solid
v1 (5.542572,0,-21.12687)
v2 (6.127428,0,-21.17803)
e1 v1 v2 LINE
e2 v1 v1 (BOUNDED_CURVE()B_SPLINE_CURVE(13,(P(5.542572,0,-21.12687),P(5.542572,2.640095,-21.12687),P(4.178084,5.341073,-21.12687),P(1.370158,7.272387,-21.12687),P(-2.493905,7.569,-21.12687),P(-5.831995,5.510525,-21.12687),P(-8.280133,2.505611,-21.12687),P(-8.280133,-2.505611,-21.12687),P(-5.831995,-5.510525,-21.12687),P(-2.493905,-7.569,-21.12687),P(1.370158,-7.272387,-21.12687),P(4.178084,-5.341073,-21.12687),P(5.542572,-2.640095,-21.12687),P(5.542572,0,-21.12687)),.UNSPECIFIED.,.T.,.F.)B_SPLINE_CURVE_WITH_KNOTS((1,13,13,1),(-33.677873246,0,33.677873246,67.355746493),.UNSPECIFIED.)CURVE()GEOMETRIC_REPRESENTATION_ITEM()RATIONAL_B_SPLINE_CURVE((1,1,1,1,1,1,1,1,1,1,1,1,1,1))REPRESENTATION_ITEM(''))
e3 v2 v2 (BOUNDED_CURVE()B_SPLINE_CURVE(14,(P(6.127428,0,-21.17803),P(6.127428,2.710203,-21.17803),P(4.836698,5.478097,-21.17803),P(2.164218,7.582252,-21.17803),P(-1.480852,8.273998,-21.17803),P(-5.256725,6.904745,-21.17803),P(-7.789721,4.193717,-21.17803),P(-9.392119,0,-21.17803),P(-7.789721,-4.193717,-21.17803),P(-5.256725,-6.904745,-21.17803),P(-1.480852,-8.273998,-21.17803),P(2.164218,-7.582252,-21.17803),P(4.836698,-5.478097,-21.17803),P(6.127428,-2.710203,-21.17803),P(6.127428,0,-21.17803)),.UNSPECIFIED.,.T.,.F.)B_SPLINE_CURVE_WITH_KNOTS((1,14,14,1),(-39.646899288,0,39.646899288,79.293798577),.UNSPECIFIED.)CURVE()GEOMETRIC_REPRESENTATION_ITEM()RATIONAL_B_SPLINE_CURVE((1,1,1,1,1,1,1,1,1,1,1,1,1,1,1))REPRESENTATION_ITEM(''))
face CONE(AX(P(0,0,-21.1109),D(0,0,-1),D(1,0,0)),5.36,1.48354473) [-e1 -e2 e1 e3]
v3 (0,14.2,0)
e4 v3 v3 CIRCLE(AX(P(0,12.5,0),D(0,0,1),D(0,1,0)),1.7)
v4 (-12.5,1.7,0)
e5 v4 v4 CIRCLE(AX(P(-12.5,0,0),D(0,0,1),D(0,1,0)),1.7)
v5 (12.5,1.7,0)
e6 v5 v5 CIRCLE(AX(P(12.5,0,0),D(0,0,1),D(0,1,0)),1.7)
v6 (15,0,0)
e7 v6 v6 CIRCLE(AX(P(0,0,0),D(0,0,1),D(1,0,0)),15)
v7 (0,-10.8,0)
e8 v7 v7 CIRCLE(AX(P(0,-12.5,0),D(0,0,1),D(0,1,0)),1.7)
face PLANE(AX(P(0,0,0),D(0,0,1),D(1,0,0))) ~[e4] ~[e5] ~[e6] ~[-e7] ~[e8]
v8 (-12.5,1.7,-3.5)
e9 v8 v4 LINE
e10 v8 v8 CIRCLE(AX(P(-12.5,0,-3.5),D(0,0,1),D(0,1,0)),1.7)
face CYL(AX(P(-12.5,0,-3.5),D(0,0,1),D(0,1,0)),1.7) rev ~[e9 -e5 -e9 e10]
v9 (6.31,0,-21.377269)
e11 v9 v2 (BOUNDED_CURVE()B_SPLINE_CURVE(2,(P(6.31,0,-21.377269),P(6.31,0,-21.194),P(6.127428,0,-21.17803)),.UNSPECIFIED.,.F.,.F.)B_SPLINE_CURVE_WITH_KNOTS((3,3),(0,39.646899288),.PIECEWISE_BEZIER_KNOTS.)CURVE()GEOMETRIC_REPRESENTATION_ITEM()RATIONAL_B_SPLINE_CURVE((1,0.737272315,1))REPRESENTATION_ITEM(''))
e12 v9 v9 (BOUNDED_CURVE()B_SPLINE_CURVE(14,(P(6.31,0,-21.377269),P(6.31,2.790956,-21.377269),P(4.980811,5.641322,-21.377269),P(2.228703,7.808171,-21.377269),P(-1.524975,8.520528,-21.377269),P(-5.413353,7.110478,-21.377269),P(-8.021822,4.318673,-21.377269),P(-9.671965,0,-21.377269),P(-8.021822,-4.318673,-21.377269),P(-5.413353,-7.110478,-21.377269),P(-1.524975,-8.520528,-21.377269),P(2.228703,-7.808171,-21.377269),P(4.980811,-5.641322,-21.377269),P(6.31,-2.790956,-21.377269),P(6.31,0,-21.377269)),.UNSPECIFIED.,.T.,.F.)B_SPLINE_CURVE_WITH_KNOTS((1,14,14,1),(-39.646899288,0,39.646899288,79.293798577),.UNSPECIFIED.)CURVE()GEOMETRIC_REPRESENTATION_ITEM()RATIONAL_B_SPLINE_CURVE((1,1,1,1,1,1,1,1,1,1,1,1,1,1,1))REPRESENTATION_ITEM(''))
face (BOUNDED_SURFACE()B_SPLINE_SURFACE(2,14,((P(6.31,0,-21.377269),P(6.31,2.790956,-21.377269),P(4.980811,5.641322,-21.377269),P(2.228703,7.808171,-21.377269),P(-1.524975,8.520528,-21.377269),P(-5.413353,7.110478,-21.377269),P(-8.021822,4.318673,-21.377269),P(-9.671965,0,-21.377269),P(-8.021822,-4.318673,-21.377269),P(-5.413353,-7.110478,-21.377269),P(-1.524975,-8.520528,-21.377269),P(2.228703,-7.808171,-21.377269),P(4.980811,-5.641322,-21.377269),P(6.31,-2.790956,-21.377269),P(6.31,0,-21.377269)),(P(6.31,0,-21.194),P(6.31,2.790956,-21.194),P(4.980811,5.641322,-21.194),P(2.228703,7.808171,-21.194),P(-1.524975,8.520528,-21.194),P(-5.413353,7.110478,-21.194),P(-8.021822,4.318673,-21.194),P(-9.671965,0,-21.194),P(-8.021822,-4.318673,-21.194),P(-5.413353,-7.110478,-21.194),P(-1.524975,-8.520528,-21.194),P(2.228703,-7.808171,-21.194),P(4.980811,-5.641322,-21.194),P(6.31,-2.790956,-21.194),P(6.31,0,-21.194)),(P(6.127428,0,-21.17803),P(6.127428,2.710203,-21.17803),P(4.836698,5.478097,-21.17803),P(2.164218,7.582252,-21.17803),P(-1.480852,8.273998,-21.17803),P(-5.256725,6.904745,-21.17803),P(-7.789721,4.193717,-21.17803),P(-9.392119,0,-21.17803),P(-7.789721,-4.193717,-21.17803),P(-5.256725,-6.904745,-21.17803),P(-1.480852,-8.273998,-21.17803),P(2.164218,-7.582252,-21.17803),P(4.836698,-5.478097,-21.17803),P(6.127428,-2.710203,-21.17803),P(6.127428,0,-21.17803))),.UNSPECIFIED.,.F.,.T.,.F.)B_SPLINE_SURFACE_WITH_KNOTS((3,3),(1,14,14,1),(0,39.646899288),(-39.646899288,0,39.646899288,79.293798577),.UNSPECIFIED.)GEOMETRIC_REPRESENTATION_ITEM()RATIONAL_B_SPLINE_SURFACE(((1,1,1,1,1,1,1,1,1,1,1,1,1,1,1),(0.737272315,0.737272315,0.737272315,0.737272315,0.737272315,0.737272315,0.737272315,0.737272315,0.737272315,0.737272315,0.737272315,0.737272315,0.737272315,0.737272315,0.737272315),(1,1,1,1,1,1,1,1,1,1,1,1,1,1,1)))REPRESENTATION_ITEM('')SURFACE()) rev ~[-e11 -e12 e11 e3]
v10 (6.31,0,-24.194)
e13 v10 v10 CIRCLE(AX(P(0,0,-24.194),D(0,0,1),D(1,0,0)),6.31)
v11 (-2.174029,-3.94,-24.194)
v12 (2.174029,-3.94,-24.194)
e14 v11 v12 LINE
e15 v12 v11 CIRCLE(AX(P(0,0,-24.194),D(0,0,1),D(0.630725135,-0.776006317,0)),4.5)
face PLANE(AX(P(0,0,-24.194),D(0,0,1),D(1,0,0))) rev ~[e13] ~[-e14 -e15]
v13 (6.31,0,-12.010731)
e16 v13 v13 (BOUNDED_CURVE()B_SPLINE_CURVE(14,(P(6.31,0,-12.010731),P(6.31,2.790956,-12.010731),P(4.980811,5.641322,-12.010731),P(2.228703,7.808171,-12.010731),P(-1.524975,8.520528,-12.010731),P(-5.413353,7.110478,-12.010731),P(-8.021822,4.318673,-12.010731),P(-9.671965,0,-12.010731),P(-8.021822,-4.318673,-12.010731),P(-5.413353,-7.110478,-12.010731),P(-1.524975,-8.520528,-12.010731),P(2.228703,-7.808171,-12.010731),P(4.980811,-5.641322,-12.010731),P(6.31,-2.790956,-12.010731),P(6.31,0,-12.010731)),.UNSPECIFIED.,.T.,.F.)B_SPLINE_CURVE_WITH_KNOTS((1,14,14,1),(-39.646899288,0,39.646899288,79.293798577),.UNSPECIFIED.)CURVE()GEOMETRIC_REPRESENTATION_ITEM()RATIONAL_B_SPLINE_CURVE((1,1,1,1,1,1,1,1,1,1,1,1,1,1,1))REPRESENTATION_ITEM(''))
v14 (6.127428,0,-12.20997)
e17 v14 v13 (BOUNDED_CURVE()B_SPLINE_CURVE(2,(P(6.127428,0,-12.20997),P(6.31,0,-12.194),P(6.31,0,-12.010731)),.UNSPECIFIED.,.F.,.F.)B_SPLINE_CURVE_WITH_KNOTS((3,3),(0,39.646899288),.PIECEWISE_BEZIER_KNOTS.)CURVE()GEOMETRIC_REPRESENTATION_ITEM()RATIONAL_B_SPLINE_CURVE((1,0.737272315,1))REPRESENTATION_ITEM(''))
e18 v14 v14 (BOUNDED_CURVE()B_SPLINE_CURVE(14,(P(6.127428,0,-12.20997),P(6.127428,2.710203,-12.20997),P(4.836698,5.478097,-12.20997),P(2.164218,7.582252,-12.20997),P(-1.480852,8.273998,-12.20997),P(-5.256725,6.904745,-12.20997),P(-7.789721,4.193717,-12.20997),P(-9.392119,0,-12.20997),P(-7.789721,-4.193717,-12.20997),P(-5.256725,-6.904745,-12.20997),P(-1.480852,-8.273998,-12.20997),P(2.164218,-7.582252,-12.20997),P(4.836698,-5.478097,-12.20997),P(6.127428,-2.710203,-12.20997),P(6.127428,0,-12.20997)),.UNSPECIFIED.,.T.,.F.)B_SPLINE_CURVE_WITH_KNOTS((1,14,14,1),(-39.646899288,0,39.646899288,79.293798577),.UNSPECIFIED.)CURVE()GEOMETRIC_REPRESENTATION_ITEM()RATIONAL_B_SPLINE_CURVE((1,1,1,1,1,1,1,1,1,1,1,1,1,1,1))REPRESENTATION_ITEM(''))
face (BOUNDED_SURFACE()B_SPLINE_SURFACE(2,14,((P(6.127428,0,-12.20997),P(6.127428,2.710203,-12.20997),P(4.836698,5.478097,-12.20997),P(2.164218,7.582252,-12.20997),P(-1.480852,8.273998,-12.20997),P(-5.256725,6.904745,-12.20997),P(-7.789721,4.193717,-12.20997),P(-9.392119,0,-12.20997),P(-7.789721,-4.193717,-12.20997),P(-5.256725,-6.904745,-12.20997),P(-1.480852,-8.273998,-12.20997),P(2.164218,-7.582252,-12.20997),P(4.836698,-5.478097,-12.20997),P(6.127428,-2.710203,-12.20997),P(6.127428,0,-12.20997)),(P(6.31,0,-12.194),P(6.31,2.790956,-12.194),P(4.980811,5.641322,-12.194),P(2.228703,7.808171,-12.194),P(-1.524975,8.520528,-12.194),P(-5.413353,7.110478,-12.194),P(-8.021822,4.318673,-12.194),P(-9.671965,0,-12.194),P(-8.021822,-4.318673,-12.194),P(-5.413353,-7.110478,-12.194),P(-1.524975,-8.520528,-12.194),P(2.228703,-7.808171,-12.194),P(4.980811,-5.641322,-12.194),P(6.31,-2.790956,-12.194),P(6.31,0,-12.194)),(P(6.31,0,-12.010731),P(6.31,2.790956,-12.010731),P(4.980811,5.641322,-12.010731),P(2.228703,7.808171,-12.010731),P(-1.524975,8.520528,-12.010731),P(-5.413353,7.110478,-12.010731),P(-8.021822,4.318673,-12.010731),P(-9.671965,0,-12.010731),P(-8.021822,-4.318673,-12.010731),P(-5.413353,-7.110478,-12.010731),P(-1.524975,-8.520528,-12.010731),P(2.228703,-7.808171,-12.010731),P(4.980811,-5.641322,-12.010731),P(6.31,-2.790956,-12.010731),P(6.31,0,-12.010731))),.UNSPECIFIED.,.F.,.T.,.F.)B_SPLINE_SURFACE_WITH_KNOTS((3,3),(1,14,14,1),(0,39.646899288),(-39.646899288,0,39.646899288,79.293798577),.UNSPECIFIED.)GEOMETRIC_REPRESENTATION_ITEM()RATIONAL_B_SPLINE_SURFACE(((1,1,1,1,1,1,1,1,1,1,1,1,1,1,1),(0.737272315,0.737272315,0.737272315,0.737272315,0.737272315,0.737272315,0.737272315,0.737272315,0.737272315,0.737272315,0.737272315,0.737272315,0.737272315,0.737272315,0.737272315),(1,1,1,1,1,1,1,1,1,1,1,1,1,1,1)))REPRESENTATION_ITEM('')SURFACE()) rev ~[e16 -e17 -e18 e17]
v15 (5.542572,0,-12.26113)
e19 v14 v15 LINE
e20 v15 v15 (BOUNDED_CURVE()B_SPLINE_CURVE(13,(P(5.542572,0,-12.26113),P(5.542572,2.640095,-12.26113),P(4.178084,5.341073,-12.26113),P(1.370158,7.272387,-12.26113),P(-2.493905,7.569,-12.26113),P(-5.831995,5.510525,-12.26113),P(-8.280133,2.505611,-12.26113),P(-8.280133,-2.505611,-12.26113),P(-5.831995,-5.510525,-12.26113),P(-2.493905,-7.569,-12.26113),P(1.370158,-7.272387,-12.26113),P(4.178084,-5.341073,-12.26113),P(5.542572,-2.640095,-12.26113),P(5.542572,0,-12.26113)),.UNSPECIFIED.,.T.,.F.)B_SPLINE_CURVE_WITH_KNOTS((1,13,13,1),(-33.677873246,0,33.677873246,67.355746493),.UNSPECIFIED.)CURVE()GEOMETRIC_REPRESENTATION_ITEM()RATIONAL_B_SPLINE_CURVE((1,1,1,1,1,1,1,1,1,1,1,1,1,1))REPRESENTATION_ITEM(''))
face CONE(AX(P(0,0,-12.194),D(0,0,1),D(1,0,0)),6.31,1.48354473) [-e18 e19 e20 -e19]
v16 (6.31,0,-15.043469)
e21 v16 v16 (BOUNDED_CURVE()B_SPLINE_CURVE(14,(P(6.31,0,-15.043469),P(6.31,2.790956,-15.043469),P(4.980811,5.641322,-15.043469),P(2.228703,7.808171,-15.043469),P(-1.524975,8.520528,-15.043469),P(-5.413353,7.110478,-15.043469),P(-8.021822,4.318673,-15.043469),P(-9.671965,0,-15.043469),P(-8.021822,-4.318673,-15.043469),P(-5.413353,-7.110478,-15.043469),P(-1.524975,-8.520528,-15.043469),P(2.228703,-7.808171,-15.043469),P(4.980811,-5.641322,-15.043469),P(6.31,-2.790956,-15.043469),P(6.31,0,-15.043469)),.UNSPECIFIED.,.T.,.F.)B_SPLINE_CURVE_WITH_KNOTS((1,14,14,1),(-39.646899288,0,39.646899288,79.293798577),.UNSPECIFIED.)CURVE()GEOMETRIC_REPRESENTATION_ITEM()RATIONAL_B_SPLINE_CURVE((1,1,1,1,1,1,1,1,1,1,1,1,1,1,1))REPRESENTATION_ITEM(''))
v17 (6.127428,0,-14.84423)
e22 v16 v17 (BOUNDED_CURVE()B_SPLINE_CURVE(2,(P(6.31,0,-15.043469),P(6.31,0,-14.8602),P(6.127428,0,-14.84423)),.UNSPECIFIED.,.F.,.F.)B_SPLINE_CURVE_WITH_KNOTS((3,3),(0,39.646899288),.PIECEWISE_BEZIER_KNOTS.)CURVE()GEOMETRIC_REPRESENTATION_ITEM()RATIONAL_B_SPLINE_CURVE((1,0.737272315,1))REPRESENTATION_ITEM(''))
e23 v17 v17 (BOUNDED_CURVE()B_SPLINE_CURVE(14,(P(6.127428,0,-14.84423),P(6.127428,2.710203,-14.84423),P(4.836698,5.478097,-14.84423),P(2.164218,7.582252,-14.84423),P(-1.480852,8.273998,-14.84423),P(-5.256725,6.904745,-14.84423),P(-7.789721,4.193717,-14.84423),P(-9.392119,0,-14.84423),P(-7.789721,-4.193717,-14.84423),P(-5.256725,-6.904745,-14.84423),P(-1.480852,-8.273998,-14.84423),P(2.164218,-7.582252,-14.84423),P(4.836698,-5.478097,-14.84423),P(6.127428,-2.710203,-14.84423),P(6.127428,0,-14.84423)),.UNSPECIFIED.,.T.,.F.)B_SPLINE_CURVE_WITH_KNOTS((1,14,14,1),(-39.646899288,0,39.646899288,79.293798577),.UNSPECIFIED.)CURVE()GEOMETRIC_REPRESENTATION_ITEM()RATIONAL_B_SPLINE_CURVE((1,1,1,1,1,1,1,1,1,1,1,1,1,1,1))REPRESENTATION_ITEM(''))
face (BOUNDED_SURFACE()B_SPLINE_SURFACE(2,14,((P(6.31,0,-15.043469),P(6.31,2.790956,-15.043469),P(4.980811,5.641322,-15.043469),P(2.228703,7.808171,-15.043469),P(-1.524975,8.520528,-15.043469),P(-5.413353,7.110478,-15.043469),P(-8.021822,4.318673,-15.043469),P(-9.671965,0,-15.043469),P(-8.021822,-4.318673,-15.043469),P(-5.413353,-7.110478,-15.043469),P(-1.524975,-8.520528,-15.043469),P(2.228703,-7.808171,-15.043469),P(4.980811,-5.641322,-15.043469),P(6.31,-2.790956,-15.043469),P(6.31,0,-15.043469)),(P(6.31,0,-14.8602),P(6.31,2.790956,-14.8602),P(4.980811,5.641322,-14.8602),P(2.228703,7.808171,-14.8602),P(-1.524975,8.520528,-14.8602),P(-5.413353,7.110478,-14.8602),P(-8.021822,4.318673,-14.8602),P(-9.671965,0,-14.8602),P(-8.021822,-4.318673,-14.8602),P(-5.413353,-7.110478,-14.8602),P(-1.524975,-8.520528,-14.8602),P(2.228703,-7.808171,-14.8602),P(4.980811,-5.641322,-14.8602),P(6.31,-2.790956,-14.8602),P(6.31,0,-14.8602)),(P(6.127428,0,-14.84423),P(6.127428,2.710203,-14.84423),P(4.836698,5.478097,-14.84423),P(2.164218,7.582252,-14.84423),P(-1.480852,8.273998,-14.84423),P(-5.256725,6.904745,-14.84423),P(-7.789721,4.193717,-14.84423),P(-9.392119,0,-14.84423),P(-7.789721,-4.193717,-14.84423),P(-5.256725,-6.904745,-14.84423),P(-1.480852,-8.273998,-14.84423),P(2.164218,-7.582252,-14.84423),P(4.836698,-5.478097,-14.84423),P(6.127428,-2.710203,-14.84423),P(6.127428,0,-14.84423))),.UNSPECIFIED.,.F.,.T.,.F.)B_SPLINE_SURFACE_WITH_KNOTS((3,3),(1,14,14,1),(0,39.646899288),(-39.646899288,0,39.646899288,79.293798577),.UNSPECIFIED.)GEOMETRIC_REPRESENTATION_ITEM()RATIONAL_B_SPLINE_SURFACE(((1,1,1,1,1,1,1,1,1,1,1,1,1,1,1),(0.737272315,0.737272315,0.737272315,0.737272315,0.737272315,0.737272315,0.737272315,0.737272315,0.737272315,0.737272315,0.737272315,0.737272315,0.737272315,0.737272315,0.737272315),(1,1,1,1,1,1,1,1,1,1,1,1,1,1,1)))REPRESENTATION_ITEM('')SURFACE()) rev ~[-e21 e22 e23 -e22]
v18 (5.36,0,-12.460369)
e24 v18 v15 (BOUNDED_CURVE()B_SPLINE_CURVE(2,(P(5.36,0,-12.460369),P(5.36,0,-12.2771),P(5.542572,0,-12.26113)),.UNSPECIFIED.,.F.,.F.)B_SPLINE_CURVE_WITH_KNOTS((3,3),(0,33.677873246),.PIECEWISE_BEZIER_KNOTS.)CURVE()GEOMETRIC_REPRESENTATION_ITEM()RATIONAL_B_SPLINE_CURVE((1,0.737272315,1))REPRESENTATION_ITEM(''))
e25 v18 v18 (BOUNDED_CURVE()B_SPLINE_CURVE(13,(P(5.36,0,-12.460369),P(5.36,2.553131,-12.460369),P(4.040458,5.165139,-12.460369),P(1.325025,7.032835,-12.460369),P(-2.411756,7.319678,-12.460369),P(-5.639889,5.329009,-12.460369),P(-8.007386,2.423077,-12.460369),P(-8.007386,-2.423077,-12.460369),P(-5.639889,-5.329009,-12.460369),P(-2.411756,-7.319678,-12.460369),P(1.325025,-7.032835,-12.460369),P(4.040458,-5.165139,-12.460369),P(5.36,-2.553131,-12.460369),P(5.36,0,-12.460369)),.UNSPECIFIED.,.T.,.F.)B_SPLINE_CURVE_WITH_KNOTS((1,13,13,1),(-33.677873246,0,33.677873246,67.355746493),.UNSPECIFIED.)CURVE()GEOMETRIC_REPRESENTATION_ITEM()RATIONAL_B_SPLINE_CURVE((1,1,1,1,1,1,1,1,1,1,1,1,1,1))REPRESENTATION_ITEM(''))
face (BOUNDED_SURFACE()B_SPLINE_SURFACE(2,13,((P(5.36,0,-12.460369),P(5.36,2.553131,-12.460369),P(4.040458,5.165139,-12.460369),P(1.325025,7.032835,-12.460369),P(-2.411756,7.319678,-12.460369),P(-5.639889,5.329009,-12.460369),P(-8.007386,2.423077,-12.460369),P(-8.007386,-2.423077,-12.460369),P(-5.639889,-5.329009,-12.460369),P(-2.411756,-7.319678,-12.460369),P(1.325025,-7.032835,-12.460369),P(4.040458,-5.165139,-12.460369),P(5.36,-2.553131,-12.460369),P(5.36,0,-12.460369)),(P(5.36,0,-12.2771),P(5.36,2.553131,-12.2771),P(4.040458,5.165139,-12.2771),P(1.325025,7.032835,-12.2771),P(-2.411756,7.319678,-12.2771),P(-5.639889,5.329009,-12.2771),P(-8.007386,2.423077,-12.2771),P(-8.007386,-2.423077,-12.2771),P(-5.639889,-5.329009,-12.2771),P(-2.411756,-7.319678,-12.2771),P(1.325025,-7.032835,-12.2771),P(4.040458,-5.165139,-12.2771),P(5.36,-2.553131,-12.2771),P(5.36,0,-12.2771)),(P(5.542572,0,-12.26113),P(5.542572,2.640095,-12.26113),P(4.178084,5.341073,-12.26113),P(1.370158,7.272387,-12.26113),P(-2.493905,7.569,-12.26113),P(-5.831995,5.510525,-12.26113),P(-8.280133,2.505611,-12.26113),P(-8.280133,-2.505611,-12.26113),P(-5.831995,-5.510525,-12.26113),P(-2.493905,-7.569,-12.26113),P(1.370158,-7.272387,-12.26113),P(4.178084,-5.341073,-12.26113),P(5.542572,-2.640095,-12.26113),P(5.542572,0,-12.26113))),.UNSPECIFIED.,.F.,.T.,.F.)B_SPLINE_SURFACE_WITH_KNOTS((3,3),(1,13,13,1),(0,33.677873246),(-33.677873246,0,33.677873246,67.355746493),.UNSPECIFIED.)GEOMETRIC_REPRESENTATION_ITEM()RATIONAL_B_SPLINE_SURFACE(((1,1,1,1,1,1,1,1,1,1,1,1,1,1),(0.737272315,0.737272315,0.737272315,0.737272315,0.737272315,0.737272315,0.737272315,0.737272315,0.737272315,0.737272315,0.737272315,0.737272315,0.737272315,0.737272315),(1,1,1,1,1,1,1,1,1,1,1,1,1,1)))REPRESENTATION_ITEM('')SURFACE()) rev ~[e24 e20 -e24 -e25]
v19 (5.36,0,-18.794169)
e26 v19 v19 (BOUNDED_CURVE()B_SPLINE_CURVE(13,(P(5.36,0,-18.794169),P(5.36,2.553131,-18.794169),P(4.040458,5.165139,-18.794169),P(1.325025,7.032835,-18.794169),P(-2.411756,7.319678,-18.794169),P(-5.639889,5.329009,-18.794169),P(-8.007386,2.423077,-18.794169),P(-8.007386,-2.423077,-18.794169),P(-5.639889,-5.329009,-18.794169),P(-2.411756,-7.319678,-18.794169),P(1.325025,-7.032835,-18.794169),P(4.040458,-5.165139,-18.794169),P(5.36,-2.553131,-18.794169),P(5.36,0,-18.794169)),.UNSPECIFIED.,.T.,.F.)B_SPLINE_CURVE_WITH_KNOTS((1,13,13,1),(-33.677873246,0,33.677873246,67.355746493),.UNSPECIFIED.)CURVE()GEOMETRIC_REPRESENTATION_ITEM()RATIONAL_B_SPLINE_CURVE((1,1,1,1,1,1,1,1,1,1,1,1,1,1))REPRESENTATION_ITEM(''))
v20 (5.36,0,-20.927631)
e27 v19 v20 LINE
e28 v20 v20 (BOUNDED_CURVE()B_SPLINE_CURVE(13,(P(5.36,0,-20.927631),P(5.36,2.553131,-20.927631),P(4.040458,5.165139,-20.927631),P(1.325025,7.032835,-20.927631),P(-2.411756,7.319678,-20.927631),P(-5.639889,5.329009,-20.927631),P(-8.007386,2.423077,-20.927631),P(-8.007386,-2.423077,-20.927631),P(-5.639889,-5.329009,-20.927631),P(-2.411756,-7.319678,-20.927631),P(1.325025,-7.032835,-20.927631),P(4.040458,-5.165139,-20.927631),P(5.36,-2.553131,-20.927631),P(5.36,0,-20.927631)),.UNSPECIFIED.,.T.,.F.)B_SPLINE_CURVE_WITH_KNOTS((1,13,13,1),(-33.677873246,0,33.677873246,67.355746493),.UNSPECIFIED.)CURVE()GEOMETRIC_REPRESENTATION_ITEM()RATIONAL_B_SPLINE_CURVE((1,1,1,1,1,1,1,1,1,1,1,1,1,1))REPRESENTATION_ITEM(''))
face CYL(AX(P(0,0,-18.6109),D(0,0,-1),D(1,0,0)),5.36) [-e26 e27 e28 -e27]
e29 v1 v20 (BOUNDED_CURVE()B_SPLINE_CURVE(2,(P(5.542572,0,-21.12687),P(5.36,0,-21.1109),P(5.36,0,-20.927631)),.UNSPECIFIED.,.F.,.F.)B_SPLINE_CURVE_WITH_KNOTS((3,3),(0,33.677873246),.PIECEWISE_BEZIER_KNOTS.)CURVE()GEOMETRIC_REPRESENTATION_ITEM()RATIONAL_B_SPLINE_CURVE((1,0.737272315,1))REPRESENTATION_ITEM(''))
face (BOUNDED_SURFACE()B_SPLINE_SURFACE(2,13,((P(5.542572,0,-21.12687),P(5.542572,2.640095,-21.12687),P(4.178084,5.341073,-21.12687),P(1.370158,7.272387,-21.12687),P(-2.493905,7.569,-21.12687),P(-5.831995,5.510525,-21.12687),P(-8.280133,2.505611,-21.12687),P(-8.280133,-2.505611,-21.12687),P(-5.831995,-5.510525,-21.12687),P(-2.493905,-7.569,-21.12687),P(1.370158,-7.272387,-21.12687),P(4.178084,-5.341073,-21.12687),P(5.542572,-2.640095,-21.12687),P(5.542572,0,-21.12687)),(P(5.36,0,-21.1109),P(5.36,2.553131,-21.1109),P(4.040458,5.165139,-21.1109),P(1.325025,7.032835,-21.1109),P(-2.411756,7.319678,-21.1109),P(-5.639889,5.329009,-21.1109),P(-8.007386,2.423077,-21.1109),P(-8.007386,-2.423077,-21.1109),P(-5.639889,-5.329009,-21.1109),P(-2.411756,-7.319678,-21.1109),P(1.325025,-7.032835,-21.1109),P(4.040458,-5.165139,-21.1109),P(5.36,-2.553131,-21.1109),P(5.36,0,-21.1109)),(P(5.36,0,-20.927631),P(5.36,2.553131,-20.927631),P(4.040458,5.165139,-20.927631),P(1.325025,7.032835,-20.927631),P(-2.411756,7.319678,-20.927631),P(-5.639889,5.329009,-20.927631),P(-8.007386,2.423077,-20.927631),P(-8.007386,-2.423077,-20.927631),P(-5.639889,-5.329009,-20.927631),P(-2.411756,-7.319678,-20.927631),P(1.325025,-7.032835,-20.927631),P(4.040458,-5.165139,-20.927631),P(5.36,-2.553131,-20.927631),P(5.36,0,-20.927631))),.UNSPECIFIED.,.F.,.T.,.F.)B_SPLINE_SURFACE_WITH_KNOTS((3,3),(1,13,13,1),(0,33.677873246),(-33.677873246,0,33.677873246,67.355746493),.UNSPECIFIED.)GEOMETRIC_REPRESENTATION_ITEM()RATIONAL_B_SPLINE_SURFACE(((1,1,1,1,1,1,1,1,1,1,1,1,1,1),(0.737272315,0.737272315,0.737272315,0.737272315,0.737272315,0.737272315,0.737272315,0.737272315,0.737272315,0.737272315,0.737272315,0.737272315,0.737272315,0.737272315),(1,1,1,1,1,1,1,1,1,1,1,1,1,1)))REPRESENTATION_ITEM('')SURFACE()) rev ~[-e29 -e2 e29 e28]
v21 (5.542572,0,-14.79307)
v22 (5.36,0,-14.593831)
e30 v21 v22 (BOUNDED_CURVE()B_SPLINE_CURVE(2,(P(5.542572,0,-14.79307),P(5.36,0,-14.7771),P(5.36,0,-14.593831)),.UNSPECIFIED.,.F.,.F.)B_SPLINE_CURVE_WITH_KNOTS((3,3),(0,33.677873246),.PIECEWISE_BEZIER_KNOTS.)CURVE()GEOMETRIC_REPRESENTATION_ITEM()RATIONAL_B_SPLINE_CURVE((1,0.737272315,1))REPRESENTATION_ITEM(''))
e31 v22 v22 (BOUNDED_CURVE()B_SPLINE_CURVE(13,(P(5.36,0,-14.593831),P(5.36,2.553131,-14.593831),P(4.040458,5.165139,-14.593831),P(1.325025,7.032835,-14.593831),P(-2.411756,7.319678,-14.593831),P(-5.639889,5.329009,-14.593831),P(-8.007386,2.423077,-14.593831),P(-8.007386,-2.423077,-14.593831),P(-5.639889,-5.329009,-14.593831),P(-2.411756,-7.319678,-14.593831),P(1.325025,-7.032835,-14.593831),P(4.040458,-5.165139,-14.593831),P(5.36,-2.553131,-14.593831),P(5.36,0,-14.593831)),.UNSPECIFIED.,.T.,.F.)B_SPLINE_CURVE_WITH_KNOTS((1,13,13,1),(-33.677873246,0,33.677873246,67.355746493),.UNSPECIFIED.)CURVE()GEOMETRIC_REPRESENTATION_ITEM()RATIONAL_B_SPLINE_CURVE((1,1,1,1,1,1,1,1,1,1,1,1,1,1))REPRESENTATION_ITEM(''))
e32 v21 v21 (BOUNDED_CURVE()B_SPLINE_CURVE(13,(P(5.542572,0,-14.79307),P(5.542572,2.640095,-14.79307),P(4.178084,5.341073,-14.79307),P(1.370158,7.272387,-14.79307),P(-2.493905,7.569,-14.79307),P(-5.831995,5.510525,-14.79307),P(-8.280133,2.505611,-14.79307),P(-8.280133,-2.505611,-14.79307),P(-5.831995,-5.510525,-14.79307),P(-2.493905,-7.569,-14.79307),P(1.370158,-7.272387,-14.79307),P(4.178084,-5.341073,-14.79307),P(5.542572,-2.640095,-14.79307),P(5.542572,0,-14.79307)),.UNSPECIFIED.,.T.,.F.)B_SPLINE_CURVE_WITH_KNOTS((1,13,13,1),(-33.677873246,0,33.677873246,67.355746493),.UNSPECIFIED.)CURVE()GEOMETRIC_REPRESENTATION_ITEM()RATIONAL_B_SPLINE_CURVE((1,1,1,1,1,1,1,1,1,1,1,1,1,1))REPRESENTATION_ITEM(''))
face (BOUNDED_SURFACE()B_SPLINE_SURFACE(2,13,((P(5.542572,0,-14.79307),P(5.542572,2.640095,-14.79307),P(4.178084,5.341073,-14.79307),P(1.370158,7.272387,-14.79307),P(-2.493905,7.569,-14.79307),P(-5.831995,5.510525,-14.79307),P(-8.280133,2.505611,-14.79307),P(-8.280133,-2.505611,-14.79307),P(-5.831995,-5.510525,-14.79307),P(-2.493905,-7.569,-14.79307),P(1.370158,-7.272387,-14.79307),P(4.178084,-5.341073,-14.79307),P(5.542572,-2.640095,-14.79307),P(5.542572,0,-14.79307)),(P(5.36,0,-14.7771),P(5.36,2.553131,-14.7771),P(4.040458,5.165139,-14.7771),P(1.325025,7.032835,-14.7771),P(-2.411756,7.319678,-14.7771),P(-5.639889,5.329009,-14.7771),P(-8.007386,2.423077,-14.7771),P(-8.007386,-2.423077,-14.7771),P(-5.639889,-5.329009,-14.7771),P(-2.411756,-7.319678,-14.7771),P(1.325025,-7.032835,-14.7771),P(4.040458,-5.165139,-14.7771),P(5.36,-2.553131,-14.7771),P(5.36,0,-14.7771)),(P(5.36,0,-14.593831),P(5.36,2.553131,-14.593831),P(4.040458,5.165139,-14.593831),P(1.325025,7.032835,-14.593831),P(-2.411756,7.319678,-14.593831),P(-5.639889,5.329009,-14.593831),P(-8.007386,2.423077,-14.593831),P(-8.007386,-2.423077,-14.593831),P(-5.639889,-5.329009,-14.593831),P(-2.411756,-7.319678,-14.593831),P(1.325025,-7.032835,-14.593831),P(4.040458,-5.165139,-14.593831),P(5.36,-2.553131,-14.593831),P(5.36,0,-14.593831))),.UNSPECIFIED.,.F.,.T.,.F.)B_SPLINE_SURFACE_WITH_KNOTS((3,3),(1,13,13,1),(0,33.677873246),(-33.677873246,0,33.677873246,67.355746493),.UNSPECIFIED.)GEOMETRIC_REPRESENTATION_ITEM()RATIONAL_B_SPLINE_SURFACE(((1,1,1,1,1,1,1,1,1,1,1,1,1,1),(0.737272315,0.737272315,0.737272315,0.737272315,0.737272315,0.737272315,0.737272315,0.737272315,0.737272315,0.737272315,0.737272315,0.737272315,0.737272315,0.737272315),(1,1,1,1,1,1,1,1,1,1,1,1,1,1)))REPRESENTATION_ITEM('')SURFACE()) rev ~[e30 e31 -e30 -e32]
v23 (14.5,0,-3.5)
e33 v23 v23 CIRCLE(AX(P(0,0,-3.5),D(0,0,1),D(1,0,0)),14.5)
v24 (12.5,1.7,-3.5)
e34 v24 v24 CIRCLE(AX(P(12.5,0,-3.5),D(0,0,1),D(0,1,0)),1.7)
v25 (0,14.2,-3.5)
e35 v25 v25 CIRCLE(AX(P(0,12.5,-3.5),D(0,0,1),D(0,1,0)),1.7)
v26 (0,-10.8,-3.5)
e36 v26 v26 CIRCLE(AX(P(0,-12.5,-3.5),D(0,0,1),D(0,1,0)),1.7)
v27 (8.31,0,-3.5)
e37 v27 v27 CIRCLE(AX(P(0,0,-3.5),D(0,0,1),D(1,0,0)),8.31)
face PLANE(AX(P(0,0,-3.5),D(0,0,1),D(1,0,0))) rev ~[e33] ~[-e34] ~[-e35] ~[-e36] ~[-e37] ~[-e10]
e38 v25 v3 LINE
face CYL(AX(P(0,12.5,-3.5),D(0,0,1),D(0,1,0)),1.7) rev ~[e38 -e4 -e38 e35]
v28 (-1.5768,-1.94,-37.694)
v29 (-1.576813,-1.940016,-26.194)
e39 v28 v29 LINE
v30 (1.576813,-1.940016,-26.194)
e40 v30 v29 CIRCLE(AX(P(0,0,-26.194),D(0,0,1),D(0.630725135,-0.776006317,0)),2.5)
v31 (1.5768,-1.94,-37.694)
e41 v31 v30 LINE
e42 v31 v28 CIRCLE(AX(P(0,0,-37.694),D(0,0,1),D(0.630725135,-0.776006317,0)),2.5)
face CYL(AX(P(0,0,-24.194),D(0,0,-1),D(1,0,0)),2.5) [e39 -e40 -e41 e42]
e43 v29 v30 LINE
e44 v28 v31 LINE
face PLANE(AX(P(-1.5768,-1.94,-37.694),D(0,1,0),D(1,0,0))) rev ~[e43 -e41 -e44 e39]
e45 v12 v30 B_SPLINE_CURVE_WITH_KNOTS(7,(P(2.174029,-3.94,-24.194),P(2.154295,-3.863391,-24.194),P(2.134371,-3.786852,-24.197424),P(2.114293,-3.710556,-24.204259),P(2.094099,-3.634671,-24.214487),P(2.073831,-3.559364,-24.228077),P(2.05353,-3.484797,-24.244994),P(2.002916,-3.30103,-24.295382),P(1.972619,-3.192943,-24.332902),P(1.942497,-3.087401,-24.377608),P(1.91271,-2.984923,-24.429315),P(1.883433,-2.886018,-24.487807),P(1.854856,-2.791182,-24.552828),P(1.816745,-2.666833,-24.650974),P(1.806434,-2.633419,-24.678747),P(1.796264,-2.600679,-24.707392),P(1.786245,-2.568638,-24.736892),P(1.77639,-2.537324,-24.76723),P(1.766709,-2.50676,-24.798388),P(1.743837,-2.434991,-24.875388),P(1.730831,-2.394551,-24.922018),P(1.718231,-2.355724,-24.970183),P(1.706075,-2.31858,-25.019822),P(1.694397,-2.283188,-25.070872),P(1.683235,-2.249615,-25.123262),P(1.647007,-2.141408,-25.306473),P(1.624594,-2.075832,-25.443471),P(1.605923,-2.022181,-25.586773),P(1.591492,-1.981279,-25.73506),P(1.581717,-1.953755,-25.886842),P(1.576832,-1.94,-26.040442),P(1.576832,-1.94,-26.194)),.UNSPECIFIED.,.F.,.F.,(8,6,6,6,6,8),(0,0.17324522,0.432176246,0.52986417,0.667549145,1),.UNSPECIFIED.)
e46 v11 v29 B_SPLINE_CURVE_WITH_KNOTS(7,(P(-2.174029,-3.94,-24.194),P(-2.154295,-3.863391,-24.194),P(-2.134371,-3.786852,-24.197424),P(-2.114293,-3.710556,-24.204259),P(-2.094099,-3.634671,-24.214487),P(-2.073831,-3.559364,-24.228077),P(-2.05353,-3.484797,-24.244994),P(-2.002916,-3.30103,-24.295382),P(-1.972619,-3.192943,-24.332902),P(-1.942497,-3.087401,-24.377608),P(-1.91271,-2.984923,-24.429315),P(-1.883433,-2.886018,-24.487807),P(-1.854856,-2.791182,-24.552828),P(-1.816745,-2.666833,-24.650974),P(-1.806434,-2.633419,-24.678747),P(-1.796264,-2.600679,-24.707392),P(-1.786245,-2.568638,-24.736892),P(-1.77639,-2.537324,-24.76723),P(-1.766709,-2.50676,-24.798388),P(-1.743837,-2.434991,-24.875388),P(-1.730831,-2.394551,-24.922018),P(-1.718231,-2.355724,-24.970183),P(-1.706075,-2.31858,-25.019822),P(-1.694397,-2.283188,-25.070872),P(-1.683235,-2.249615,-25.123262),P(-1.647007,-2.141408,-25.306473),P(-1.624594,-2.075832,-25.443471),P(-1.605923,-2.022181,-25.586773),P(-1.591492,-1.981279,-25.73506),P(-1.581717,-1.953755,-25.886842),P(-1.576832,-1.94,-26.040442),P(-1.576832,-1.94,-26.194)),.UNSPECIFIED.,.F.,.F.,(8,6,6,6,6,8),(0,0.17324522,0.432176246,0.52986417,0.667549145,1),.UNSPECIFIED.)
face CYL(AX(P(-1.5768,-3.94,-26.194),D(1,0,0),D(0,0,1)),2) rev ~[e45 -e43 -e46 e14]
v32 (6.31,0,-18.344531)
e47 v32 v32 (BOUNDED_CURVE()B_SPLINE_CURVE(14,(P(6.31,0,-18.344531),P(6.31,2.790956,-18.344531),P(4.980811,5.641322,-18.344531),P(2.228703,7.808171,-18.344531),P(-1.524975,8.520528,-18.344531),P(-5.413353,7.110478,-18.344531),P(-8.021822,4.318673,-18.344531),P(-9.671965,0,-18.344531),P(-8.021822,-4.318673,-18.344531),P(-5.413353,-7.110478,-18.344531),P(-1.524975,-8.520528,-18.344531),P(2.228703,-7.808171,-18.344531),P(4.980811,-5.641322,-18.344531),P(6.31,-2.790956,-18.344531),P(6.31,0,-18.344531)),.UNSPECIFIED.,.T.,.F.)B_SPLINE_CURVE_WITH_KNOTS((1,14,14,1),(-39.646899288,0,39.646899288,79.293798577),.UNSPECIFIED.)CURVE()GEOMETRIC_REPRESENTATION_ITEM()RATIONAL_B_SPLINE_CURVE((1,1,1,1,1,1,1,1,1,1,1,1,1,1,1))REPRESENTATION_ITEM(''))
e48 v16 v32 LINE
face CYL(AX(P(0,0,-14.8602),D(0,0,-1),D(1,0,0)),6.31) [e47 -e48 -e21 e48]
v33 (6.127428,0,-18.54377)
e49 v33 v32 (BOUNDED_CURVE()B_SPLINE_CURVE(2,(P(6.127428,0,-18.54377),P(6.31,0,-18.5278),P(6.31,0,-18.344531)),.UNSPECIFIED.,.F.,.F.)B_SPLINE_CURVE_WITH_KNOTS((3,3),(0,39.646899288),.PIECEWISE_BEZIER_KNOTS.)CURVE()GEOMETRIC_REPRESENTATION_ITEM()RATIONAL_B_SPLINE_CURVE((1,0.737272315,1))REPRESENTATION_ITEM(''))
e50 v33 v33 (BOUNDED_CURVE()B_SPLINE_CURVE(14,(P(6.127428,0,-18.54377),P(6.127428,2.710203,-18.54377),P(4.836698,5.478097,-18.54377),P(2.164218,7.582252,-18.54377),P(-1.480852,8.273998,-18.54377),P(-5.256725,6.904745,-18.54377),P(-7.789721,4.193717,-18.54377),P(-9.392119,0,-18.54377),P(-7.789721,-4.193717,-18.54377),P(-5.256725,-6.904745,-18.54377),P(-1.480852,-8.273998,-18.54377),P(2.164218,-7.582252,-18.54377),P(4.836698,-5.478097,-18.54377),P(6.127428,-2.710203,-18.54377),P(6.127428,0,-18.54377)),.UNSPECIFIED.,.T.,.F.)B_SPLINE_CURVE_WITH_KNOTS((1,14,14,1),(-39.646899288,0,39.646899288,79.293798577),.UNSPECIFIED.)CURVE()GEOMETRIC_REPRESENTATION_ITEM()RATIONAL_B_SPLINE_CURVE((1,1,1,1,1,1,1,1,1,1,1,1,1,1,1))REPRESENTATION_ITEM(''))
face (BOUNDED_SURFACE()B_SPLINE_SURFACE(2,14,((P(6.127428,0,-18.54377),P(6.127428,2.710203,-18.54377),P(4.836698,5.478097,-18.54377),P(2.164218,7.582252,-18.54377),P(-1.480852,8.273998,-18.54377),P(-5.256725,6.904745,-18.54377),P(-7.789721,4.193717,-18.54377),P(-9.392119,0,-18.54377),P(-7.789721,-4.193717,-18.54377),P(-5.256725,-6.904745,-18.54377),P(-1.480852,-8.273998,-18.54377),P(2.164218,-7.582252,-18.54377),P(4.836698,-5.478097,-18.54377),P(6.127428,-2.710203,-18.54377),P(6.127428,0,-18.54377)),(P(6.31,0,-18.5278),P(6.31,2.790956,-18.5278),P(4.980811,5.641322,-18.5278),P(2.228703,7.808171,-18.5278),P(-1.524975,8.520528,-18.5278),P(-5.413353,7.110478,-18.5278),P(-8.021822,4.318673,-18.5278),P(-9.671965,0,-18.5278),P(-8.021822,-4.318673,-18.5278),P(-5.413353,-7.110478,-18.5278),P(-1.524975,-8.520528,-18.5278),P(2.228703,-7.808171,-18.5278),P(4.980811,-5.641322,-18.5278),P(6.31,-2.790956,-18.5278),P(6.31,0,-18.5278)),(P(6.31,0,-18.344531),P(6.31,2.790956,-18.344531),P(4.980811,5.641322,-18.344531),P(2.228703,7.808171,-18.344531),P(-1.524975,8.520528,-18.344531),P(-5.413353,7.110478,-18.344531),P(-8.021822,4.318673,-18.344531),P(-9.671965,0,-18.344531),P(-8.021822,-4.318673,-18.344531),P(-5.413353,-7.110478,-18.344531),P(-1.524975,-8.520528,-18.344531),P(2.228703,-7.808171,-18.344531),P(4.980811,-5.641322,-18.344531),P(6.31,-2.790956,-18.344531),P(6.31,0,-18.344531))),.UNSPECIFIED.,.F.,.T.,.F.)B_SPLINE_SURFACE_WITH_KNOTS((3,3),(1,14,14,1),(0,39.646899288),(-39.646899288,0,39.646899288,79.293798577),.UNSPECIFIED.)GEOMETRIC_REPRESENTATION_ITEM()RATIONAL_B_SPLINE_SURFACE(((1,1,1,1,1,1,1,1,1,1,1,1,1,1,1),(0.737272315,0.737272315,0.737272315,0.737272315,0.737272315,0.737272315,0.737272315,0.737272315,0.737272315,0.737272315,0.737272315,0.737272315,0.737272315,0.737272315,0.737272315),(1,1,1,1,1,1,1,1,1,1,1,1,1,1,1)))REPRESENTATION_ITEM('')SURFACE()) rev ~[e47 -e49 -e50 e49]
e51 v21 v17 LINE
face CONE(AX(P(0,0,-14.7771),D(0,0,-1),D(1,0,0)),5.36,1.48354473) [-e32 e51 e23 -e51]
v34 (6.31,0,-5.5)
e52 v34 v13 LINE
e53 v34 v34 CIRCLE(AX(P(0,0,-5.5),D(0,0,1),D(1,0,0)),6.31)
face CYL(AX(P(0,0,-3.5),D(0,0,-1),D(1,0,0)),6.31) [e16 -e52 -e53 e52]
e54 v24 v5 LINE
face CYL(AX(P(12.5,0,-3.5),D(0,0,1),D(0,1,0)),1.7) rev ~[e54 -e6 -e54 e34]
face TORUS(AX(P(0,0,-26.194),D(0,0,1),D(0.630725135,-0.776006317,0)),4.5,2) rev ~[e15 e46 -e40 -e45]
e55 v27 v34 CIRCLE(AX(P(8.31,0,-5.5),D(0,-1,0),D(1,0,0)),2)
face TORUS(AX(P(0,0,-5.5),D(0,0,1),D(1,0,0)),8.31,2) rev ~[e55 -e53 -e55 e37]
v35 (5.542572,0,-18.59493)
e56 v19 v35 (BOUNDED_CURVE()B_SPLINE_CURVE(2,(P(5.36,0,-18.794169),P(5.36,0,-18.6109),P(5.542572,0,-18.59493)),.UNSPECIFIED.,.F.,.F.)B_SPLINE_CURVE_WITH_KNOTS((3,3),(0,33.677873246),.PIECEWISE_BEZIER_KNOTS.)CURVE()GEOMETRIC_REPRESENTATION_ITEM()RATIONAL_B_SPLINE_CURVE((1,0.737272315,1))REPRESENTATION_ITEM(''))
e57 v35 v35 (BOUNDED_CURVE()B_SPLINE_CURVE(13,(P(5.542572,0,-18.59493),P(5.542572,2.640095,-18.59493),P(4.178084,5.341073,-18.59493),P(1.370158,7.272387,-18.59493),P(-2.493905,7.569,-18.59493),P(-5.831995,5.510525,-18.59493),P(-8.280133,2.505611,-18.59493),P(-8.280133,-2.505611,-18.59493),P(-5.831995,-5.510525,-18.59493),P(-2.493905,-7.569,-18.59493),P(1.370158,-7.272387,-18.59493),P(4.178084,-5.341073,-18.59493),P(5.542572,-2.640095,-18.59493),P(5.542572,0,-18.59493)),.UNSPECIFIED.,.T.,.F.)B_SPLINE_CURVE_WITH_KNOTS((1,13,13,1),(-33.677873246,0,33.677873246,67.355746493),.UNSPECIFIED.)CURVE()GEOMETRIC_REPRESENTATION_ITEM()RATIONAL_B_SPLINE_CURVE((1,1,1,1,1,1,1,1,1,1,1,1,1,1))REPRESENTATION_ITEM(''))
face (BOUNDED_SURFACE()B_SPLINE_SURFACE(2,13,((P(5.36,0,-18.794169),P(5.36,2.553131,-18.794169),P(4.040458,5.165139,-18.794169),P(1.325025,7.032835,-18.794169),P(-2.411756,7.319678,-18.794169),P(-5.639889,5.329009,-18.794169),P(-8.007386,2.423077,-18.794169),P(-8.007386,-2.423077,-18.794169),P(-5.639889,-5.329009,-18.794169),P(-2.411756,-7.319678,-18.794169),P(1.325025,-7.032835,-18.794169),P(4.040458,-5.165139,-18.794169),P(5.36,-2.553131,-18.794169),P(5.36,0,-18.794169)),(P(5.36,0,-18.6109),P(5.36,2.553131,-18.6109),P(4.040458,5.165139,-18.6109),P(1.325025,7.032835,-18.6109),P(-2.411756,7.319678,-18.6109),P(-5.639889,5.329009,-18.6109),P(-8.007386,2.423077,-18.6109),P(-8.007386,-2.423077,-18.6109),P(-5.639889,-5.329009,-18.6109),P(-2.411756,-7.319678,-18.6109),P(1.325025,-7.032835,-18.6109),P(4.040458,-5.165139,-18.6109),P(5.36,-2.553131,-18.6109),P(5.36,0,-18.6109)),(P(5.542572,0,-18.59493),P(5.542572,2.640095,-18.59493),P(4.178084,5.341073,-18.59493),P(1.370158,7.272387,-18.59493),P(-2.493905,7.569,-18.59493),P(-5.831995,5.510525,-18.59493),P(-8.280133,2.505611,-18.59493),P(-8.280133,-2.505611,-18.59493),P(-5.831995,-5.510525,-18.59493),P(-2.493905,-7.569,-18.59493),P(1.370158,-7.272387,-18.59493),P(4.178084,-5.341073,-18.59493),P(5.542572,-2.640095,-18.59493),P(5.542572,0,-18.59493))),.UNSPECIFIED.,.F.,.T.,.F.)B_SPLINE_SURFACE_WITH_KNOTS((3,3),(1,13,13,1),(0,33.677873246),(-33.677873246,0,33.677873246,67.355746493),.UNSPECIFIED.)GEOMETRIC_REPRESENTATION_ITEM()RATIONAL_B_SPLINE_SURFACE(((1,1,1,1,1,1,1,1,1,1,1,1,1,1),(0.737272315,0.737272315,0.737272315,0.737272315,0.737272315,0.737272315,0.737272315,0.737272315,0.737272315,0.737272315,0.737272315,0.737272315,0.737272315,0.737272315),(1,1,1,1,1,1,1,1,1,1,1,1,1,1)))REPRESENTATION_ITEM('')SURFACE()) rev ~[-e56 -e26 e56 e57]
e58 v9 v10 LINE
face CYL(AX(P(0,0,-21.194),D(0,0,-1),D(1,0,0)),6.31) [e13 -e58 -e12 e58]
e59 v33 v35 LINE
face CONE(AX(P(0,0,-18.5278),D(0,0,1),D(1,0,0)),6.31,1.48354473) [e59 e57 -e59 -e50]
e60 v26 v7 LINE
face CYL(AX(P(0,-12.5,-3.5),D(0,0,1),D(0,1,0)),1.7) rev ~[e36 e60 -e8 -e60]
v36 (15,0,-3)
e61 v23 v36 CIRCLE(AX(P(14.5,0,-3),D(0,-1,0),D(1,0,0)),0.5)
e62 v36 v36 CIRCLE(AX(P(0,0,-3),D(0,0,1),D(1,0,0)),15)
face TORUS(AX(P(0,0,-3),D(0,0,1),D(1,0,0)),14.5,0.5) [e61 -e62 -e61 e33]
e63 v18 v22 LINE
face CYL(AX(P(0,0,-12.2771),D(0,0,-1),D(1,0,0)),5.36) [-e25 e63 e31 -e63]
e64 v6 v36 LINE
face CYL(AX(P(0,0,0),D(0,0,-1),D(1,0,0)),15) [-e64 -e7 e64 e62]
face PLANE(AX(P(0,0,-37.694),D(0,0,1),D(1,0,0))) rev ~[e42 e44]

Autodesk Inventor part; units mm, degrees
ref_plane "YZ Plane" through (0, 0, 0) normal (1, 0, 0) x (0, 1, 0)
ref_plane "XZ Plane" through (0, 0, 0) normal (0, 1, 0) x (-1, 0, 0)
ref_plane "XY Plane" through (0, 0, 0) normal (0, 0, 1) x (1, 0, 0)
sketch "Boceto1" plane through (0, 0, 0) normal (0, 1, 0) x (-1, 0, 0)
  line L0 (0, 0) -> (-15, 0)
  line L1 (-15, 0) -> (-15, -3.5)
  line L2 (-15, -3.5) -> (-6.31, -3.5)
  line L3 (-6.31, -3.5) -> (-6.31, -12.194)
  line L4 (-6.31, -12.194) -> (-5.36, -12.2771)
  line L5 (-5.36, -12.2771) -> (-5.36, -14.7771)
  line L6 (-5.36, -14.7771) -> (-6.31, -14.8602)
  line L7 (-6.31, -14.8602) -> (-6.31, -18.5278)
  line L8 (-6.31, -18.5278) -> (-5.36, -18.6109)
  line L9 (-5.36, -18.6109) -> (-5.36, -21.1109)
  line L10 (-5.36, -21.1109) -> (-6.31, -21.194)
  line L11 (-6.31, -21.194) -> (-6.31, -24.194)
  line L12 (0, -37.694) -> (0, 0)
  line L13 (-5.36, -13.5271) -> (-6.26, -13.5271) construction
  line L14 (-5.36, -19.8609) -> (-6.1624, -19.8609) construction
  line L15 (-5.36, -12.2771) -> (-6.6407, -12.2771) construction
  line L16 (-6.81, -3.5) -> (-6.81, -24.194) construction
  line L17 (-6.31, -24.194) -> (-2.5, -24.194)
  line L18 (-2.5, -24.194) -> (-2.5, -37.694)
  line L19 (-2.5, -37.694) -> (0, -37.694)
  dimension "d0" = 30
  dimension "d1" = 3.5
  dimension "d3" = 2.5
  dimension "d4" = 5
  dimension "d6" = 0.5
  dimension "d7" = 8.694
  dimension "d9" = 3
  dimension "d10" = 5
  dimension "d11" = 13.5
  dimension "d33" = 20.694
  dimension "d36" = 13.62
  dimension "d37" = 1.45
revolve "Revolución1" add sketch "Boceto1" angle 360 about axis through (0, 0, -37.694) along (0, 0, 1)
fillet "Empalme1" radius 0.2 8 edges at (-6.31, 0, -21.194) (-5.36, 0, -21.1109) (-5.36, 0, -18.6109) (-6.31, 0, -18.5278) (-6.31, 0, -14.8602) (-5.36, 0, -14.7771) (-5.36, 0, -12.2771) (-6.31, 0, -12.194)
sketch "Boceto2" plane through (0, 0, -37.694) normal (0, 0, -1) x (-1, 0, 0)
  circle A0 centre (0, 0) radius 2.5 projected
  line L0 (1.5768, -1.94) -> (-1.5768, -1.94)
  point P0 (0, 0)
  point P1 (0, 2.5)
  point P2 (0, -1.94)
  dimension "d16" = 4.44
extrude "Extrusión1" cut sketch "Boceto2" against normal up to surface (13.5 mm away) contours L0 A0 picked at (-0.3662, -2.0419)
fillet "Empalme2" radius 0.5 1 edges at (-15, 0, -3.5)
sketch "Boceto3" plane through (0, 0, -3.5) normal (0, 0, -1) x (-1, 0, 0)
  point P0 (0, 0)
  point P1 (0, -12.5)
  point P2 (12.5, 0)
  point P3 (0, 12.5)
  point P4 (-12.5, 0)
  dimension "d20" = 12.5
  dimension "d23" = 360
hole "Agujero1" at (0, -12.5, -3.5) at (-12.5, 0, -3.5) at (0, 12.5, -3.5) at (12.5, 0, -3.5) direction (0, 0, 1) diameter 3.4 end through all clearance for "Tornillo de cabeza plana avellanada ISO 2009/7046" size "M3" standard "ISO"
fillet "Empalme3" radius 2 1 edges at (-6.31, 0, -3.5)
fillet "Empalme4" radius 2 2 edges at (0, 2.5, -24.194) (0, -1.94, -24.194)
properties part number "Rotor" material "Acero inoxidable"
